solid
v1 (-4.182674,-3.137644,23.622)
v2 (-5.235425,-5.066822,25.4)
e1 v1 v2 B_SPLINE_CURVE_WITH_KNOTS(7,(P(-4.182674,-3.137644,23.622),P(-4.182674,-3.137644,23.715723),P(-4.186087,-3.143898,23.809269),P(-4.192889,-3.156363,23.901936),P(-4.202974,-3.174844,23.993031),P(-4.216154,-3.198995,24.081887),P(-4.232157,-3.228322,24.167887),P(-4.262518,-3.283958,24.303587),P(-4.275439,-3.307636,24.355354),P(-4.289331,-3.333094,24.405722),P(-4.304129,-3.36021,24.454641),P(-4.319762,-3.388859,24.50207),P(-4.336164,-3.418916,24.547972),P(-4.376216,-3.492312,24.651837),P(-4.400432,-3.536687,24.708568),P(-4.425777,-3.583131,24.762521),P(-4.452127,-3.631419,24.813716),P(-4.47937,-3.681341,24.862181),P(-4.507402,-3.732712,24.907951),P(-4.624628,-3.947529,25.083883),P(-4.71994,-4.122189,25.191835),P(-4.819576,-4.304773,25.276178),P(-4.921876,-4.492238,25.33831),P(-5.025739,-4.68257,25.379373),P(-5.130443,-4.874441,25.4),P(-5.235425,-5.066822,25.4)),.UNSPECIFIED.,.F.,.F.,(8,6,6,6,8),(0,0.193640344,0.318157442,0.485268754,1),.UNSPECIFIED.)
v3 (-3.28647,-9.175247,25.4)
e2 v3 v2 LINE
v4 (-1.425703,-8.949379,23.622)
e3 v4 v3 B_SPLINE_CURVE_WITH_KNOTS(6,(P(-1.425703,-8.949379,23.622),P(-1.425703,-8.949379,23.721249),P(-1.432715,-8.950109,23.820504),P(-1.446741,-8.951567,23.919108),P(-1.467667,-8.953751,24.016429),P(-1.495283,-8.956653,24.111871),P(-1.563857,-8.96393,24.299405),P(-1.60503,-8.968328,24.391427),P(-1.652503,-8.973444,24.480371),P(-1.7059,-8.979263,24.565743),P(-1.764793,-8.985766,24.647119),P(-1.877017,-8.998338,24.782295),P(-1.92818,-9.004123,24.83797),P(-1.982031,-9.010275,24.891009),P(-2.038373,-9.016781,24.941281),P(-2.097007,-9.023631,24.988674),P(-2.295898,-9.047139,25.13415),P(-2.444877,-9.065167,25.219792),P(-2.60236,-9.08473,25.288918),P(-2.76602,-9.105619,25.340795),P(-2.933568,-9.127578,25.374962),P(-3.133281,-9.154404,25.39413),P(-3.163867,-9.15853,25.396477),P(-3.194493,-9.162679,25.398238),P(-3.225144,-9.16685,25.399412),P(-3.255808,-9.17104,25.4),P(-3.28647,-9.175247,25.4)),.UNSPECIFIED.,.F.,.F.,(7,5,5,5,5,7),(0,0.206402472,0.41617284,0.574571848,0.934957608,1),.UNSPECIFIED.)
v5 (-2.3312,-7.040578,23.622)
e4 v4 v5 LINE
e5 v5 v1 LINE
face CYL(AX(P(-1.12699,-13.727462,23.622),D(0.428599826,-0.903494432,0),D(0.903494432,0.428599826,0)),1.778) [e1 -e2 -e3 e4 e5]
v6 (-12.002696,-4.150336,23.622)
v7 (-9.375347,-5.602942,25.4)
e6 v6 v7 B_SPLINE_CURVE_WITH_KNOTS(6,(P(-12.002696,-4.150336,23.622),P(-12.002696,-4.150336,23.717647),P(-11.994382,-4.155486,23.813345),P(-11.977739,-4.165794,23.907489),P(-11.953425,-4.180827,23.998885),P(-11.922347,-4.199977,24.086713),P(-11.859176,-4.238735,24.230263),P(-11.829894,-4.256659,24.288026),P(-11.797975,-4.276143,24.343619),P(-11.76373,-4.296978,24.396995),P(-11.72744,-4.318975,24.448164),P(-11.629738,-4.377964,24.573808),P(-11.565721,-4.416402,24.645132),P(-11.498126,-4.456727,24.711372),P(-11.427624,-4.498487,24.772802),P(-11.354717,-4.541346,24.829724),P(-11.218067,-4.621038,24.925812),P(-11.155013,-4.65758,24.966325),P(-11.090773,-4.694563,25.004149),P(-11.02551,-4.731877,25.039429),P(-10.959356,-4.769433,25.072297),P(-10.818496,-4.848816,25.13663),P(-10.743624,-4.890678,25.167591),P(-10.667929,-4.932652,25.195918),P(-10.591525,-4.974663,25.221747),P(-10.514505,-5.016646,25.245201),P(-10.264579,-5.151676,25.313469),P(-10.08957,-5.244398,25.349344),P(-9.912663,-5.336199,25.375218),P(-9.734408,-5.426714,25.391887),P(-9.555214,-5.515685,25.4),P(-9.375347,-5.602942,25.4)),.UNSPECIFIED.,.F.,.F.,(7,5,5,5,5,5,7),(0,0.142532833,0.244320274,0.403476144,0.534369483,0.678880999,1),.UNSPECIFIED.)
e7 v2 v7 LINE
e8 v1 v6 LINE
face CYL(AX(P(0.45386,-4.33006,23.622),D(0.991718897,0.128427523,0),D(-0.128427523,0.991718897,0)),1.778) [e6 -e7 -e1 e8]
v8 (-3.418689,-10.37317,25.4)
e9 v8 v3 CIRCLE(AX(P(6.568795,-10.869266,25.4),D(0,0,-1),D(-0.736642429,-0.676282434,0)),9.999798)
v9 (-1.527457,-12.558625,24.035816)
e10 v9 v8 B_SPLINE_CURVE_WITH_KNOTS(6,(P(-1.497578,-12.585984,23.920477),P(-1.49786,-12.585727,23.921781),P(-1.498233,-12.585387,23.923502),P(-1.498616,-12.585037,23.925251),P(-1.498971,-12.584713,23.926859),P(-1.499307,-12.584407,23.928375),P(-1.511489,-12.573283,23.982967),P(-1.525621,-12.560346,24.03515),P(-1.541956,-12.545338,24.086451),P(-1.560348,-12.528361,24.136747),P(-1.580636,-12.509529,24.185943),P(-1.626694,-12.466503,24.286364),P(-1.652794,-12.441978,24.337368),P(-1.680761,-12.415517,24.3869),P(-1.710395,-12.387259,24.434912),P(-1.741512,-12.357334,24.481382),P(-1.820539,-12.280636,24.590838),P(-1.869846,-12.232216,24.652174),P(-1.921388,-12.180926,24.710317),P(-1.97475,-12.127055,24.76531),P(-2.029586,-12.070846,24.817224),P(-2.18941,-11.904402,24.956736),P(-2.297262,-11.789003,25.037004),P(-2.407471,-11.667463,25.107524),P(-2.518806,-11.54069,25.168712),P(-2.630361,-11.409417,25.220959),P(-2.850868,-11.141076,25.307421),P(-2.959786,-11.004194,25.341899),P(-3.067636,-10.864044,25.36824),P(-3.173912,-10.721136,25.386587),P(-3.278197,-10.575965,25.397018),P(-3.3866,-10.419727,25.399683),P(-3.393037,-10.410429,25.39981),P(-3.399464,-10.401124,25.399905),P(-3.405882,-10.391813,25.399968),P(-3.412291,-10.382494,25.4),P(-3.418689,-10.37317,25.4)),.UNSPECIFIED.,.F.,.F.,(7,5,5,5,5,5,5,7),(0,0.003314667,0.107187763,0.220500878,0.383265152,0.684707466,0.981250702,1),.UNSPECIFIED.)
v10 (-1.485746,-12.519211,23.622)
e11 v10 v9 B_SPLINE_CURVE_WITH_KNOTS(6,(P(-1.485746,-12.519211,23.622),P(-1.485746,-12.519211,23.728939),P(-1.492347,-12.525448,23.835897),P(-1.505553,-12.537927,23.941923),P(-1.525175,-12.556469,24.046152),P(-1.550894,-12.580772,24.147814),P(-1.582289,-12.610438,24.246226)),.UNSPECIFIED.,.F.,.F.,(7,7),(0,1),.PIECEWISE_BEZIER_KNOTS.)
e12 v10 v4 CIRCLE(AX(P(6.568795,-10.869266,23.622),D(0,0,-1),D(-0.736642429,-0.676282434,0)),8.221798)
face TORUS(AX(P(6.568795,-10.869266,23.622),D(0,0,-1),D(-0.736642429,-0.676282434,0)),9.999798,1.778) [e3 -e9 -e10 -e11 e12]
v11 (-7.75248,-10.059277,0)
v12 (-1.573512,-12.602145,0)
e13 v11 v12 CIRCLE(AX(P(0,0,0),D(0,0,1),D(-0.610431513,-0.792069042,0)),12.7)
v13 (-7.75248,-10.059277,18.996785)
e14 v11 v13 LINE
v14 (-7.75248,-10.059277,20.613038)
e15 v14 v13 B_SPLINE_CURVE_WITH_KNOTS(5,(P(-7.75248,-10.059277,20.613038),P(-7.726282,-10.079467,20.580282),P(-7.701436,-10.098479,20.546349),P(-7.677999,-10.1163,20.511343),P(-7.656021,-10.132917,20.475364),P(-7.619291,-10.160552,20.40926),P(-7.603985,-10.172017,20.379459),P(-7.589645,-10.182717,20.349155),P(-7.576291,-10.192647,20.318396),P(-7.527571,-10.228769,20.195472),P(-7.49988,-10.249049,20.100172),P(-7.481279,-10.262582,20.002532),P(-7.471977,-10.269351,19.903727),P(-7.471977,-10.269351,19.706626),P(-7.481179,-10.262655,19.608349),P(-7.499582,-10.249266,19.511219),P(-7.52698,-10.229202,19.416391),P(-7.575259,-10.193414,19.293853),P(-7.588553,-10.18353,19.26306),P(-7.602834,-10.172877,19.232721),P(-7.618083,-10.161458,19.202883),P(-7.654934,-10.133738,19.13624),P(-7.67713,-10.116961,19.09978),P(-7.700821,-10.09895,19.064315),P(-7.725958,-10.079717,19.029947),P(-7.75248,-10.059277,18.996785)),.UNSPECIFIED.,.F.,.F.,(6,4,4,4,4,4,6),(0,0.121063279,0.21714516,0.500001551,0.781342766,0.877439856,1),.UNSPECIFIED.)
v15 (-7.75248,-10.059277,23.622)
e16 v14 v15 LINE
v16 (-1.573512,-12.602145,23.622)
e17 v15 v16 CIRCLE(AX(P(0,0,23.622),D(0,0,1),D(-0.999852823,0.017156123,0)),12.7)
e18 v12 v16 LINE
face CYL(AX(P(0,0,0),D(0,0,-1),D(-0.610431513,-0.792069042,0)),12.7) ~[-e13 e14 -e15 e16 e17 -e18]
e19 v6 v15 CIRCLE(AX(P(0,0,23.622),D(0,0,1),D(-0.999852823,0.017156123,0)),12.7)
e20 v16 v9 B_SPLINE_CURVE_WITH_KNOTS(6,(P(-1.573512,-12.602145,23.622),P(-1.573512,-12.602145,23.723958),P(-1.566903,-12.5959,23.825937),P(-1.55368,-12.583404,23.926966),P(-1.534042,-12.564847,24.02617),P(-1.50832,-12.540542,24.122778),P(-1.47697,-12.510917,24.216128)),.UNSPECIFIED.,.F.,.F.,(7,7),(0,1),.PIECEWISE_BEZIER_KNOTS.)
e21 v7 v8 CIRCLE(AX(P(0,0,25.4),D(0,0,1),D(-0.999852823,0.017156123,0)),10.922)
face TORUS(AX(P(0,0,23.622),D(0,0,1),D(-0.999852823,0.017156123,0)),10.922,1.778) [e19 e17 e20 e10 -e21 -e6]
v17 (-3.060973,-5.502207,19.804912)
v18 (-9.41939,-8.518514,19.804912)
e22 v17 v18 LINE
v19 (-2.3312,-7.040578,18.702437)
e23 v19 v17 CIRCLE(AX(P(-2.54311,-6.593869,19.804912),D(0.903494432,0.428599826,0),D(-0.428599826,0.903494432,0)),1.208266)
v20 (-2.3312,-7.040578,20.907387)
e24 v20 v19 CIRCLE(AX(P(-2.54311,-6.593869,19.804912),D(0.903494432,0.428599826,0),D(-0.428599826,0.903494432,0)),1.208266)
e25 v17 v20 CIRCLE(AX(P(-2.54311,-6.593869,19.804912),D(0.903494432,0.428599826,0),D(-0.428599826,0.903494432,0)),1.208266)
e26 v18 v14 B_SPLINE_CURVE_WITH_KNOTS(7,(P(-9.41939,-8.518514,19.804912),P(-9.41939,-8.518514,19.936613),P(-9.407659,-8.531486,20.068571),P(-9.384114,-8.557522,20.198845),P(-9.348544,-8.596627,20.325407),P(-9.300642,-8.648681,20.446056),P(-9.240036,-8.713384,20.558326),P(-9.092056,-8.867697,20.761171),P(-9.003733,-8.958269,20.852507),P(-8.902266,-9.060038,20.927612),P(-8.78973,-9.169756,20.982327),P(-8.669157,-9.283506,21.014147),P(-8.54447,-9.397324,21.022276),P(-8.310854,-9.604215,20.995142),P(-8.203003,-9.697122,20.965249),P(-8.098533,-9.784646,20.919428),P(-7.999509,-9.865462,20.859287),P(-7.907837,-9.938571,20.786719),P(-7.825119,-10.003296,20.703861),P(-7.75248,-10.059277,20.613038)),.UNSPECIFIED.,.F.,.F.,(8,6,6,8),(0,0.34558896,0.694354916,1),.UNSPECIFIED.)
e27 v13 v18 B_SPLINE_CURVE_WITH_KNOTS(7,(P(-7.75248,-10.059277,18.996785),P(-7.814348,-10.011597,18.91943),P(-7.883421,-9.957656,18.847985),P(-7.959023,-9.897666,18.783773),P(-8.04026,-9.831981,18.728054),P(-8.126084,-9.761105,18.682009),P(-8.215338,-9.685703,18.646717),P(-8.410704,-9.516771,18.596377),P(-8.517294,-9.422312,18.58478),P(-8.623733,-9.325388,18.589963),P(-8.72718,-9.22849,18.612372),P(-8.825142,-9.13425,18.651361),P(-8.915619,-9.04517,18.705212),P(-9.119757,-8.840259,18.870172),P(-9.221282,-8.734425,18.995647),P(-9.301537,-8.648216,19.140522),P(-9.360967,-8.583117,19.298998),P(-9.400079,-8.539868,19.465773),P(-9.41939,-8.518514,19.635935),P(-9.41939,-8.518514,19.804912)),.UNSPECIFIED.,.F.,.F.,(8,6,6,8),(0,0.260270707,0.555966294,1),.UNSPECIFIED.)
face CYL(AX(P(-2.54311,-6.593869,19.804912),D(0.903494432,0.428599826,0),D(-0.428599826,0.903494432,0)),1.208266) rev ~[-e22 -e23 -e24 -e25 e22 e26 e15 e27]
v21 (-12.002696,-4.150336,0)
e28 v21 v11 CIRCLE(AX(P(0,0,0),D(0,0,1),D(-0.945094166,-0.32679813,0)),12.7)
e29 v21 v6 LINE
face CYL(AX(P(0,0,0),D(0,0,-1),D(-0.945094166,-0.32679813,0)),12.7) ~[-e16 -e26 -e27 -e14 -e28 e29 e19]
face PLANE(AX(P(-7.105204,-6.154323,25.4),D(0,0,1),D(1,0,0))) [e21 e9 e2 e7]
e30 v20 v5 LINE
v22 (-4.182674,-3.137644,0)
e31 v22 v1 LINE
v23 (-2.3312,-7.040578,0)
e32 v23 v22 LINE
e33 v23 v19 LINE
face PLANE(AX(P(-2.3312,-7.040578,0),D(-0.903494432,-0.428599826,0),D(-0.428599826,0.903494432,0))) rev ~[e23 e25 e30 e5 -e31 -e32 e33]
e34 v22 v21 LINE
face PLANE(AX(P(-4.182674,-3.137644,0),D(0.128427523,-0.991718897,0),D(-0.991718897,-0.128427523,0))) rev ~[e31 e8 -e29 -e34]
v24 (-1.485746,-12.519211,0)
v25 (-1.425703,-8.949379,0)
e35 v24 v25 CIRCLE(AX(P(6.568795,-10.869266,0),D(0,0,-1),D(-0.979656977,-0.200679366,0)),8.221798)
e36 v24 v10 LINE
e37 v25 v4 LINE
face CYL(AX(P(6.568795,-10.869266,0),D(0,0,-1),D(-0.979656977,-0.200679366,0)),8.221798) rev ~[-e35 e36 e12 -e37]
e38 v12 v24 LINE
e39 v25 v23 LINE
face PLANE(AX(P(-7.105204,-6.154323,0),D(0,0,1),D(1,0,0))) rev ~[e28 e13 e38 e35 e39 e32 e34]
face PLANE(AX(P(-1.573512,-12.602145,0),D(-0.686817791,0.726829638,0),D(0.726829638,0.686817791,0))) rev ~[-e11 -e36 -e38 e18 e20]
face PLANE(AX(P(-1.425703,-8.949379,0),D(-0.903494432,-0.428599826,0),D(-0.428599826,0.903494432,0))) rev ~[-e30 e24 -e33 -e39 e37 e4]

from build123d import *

# Parameters (mm, degrees)
F1_DEPTH    = 25.4
F2_T1_DEPTH = 15.3225079539
F2_T3_DEPTH = 16.775320589
F2_T6_ANGLE = 87.0348581142
F2_T8_ANGLE = 103.9234369613
F3_R        = 1.2082658068
F4_DEPTH    = 25.4


# Not quite as in the source:
# - a fillet or chamfer that OpenCascade refuses, or shapes differently, is made with other operations: its cross-section is extruded or revolved along the edge and cut away or added


with BuildPart() as f1:
    # F0 (on Top) → F1 (new body)
    with BuildSketch(Plane.XY):
        with BuildLine():
            ThreePointArc((-7.752480221, -10.059276834), (-4.8810304794, -8.8387254095), (-2.3312001475, -7.0405778413))
            Line((-2.3312001475, -7.0405778413), (-4.1826744651, -3.1376440612))
            Line((-4.1826744651, -3.1376440612), (-12.0026959047, -4.1503362537))
            ThreePointArc((-12.0026959047, -4.1503362537), (-10.3099777223, -7.4158181858), (-7.752480221, -10.059276834))
        make_face()
        with BuildLine():
            ThreePointArc((-1.4857464298, -12.5192106342), (-1.6518399037, -10.7309962936), (-1.4257026774, -8.9493791841))
            Line((-1.4257026774, -8.9493791841), (-2.3312001475, -7.0405778413))
            ThreePointArc((-2.3312001475, -7.0405778413), (-4.8810304794, -8.8387254095), (-7.752480221, -10.059276834))
            ThreePointArc((-7.752480221, -10.059276834), (-4.8332265428, -11.7443569933), (-1.5735123086, -12.6021450164))
            Line((-1.5735123086, -12.6021450164), (-1.4857464298, -12.5192106342))
        make_face()
    extrude(amount=F1_DEPTH)

    # F2: fillet of radius 1.778 on 4 edges, made by hand

    # F2_s2 → F2_t1 (cut)
    with BuildSketch(Plane(origin=(5.1087634899, -10.7693449534, 0), x_dir=(0, 0, 1), z_dir=(-0.4285998257, 0.9034944324, 0))):
        with BuildLine():
            ThreePointArc((23.622, -5.1238167896), (24.8792358569, -5.6445809326), (25.4, -6.9018167896))
            Line((25.4, -6.9018167896), (25.4, -5.1238167896))
            Line((25.4, -5.1238167896), (23.622, -5.1238167896))
        make_face()
    extrude(amount=F2_T1_DEPTH, mode=Mode.SUBTRACT)

    # F2_s4 → F2_t3 (cut)
    with BuildSketch(Plane(origin=(-0.1051193903, -0.0136129532, 0), x_dir=(0, 0, 1), z_dir=(-0.9917188973, -0.1284275232, 0))):
        with BuildLine():
            ThreePointArc((23.622, -2.5744903868), (24.8792358569, -3.0952545299), (25.4, -4.3524903868))
            Line((25.4, -4.3524903868), (25.4, -2.5744903868))
            Line((25.4, -2.5744903868), (23.622, -2.5744903868))
        make_face()
    extrude(amount=F2_T3_DEPTH, mode=Mode.SUBTRACT)

    # F2_s5 → F2_t6 (revolve, cut)
    with BuildSketch(Plane(origin=(8.4191230763, -9.1705520677, 0), x_dir=(0, 0, 1), z_dir=(0.6762824344, -0.7366424295, 0))):
        with BuildLine():
            ThreePointArc((23.622, 10.7336378697), (24.8792358569, 11.2544020127), (25.4, 12.5116378697))
            Line((25.4, 12.5116378697), (25.4, 10.7336378697))
            Line((25.4, 10.7336378697), (23.622, 10.7336378697))
        make_face()
    revolve(axis=Axis((6.5687949782, -10.8692655012, 25.4), (0, 0, -1)), revolution_arc=F2_T6_ANGLE, mode=Mode.SUBTRACT)

    # F2_s7 → F2_t8 (revolve, cut)
    with BuildSketch(Plane(origin=(0, 0, 0), x_dir=(0, 0, 1), z_dir=(0.017156123, 0.9998528229, 0))):
        with BuildLine():
            ThreePointArc((23.622, -12.7), (24.8792358569, -12.1792358569), (25.4, -10.922))
            Line((25.4, -10.922), (25.4, -12.7))
            Line((25.4, -12.7), (23.622, -12.7))
        make_face()
    revolve(axis=Axis((0, 0, 25.4), (0, 0, 1)), revolution_arc=F2_T8_ANGLE, mode=Mode.SUBTRACT)

    # F3 (on face) → F4 (cut)
    with BuildSketch(Plane(origin=(-4.6293399422, -2.1960669829, 0), x_dir=(-0.4285998257, 0.9034944324, 0), z_dir=(0.9034944324, 0.4285998257, 0))):
        with Locations((-4.8675471917, 19.804911688)):
            Circle(F3_R)
    extrude(amount=-F4_DEPTH, mode=Mode.SUBTRACT)


solid = f1.part
